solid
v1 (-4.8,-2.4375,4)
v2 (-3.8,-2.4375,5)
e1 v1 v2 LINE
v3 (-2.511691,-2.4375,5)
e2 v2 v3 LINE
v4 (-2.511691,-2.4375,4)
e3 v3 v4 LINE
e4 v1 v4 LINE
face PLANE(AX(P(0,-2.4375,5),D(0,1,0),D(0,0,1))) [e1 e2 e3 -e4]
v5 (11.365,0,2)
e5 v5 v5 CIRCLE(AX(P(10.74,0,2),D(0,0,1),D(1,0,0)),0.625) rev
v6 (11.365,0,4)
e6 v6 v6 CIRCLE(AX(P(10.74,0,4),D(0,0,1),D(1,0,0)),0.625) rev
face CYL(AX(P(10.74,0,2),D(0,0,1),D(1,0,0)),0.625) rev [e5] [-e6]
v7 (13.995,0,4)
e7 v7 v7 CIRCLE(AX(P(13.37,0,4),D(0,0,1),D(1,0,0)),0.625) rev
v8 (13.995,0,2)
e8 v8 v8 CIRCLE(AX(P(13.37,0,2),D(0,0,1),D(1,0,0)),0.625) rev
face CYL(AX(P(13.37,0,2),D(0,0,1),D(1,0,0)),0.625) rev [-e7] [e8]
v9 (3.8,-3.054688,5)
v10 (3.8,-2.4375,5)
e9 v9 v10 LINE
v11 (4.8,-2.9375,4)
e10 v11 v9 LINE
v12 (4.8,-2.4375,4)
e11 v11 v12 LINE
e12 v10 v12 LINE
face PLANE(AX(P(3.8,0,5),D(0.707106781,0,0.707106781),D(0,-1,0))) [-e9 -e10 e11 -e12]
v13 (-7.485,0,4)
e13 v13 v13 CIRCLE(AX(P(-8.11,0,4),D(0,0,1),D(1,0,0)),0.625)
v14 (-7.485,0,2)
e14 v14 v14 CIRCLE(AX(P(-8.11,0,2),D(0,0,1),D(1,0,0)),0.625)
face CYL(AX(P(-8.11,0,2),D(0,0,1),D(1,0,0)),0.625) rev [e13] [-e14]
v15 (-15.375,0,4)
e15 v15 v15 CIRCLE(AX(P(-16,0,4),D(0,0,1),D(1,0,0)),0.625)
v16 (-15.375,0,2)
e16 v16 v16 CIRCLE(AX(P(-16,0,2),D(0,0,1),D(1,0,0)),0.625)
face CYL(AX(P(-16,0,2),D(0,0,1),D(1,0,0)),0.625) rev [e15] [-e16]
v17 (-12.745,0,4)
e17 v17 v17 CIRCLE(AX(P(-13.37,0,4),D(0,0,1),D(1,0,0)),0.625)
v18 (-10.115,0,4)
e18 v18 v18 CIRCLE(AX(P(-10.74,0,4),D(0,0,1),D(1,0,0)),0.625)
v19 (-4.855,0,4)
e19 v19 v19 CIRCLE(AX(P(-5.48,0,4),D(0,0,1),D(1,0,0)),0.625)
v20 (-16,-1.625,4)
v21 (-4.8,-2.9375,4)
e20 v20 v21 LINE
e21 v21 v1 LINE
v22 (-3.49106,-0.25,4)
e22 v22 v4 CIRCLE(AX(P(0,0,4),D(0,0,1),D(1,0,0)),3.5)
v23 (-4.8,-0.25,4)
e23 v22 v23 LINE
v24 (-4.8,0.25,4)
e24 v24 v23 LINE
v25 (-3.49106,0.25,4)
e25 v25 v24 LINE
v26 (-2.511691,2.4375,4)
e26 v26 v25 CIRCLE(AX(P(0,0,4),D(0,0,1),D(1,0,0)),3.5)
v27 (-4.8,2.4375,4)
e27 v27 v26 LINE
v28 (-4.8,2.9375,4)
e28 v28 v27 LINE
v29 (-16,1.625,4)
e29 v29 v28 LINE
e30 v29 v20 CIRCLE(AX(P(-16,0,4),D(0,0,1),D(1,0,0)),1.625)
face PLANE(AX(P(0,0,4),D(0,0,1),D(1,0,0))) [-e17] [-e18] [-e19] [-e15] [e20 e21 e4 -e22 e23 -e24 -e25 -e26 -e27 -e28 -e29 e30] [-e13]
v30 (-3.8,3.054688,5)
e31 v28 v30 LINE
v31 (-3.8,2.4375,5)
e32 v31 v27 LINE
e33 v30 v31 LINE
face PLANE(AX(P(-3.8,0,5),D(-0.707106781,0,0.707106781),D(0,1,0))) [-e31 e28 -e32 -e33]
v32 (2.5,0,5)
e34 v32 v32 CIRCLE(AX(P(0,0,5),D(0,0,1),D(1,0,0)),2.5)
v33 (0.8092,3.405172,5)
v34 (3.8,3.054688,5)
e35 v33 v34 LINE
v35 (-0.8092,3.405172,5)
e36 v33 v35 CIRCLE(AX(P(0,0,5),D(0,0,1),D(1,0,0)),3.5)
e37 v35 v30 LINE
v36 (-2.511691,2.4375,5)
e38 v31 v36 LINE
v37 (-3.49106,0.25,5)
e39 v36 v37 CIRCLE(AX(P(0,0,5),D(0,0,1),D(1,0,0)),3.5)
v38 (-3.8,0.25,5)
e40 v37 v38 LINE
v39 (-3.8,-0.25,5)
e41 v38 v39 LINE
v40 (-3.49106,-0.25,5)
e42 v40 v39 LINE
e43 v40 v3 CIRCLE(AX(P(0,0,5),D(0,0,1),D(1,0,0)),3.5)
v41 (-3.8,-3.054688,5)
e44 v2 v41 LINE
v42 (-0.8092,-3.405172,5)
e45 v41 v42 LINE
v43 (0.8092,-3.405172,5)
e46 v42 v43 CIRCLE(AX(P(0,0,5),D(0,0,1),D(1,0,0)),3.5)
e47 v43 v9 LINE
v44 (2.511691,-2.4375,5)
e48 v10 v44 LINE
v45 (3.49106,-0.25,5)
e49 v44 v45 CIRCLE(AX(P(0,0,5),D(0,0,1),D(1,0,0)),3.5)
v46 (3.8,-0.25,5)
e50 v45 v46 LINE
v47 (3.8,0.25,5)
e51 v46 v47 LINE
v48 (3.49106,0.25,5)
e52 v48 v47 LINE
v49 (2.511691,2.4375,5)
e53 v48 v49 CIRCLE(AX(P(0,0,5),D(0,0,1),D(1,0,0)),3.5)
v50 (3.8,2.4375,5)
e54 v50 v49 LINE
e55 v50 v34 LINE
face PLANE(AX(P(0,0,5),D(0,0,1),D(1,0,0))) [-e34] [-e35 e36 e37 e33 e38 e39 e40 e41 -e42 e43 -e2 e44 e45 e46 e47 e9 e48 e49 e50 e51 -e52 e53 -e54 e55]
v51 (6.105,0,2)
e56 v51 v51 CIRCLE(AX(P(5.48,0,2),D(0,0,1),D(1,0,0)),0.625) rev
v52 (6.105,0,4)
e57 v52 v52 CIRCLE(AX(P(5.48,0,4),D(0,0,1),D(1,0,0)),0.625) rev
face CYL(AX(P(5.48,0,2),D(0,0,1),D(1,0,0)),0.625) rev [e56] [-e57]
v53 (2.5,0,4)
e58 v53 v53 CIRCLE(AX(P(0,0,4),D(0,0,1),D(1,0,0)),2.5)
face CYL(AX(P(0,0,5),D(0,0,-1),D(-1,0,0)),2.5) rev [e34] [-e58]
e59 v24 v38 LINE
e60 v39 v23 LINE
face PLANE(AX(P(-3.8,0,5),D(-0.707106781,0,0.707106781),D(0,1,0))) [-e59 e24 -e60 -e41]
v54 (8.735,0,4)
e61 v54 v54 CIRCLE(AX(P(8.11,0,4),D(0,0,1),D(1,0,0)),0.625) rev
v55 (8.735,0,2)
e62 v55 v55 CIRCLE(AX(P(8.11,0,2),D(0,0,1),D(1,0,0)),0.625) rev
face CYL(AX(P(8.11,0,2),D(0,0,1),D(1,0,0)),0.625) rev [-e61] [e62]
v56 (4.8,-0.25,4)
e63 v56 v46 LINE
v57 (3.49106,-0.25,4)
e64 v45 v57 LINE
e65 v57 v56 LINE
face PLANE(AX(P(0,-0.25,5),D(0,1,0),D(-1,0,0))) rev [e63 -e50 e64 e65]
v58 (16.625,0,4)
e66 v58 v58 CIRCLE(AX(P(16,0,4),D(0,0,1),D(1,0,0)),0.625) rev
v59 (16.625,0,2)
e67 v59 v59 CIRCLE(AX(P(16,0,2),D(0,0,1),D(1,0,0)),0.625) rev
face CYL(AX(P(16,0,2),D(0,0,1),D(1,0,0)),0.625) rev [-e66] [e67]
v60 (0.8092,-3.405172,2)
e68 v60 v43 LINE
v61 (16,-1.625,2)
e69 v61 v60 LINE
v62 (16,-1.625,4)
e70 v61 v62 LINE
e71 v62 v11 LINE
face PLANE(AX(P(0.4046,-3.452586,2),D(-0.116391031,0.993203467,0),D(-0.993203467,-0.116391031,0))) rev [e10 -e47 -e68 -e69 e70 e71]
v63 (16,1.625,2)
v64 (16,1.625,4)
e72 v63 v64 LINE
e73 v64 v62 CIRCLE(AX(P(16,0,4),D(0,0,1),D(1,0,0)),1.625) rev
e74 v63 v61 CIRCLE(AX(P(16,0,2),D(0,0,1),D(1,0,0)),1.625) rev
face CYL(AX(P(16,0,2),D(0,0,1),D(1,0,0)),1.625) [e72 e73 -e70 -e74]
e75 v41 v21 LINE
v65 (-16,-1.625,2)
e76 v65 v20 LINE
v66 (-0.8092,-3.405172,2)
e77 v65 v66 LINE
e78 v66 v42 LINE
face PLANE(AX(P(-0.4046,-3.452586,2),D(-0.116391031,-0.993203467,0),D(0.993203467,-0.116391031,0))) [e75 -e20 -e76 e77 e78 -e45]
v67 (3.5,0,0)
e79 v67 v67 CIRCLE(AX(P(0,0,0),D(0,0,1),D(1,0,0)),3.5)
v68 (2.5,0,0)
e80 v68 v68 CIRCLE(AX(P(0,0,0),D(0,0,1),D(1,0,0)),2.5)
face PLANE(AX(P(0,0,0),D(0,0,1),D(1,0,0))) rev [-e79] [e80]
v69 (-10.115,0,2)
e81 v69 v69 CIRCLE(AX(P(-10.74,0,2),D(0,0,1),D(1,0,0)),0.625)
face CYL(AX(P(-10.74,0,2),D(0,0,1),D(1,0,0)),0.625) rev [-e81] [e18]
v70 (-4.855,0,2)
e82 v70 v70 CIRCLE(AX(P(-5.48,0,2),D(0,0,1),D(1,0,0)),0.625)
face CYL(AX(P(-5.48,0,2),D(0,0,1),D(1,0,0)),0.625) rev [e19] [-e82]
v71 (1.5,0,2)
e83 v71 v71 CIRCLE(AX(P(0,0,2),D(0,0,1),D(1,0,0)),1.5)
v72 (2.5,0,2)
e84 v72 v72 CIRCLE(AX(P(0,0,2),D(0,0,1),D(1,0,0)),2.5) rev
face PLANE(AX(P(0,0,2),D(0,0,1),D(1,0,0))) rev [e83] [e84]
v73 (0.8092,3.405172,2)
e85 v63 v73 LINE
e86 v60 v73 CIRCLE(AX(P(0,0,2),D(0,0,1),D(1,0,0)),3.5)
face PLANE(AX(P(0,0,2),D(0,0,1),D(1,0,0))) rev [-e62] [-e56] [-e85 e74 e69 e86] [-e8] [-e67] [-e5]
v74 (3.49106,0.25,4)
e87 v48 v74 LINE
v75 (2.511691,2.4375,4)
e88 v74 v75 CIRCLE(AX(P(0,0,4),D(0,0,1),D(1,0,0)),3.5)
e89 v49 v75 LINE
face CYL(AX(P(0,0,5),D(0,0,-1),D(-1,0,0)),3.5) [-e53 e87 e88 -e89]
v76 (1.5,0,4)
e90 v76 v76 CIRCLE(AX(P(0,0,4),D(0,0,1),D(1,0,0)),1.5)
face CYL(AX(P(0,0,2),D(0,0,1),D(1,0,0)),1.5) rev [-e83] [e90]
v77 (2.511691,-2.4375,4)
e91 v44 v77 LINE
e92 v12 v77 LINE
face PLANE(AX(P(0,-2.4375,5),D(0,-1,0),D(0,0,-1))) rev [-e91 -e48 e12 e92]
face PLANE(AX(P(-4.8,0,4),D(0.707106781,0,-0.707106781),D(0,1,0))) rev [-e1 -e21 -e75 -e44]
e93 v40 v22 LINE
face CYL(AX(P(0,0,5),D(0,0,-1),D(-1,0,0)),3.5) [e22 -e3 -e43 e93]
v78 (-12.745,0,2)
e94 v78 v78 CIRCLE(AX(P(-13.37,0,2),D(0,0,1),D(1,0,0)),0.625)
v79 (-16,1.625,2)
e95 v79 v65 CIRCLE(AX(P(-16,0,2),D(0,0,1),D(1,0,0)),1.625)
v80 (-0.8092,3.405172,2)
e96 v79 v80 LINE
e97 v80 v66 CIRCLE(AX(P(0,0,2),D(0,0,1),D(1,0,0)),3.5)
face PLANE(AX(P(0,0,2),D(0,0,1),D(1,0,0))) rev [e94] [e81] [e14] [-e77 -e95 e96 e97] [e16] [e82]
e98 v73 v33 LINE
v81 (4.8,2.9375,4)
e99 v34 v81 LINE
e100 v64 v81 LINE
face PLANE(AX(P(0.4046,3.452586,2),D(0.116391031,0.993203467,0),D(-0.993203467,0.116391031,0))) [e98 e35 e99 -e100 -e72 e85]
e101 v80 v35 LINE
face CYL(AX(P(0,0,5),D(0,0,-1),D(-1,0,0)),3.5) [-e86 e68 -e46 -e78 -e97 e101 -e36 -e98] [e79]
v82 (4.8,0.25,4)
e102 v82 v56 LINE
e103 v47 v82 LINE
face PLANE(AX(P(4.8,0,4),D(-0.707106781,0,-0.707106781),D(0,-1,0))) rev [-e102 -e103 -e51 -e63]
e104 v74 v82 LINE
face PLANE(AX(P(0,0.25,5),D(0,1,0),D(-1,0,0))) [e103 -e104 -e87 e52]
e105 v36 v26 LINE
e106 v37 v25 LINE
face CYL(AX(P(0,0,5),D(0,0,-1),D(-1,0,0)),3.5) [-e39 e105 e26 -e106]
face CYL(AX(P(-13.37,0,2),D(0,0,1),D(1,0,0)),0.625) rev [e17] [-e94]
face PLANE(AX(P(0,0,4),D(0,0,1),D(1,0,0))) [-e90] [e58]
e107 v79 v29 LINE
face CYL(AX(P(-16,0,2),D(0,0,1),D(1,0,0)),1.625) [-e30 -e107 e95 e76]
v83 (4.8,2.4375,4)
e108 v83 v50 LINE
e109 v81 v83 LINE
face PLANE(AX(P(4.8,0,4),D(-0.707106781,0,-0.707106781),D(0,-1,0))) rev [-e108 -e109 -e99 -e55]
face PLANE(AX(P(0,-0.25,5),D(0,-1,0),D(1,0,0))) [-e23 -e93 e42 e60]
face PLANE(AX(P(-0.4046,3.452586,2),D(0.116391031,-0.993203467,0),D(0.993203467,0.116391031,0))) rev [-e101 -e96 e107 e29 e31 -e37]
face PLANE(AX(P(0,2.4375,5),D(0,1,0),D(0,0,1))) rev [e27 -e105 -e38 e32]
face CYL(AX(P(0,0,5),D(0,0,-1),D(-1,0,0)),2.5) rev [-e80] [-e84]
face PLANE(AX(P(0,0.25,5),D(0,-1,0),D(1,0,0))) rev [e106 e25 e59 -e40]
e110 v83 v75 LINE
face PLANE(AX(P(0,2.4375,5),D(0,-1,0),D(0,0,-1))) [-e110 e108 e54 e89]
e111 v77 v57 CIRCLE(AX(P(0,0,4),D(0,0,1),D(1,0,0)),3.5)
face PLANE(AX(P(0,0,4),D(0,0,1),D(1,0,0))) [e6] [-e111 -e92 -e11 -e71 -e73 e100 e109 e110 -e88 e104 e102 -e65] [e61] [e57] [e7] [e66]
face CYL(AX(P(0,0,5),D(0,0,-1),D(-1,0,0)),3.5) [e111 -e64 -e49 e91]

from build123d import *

# Parameters (mm, degrees)
SKETCH_1_R      = 3.5
SKETCH_1_R_2    = 2.5
EXTRUDE_1_DEPTH = 5
EXTRUDE_START   = -3
SKETCH_2_R      = 0.625
SKETCH_2_R_2    = 1.625
SKETCH_2_R_3    = 2.5
SKETCH_2_R_4    = 1.5
EXTRUDE_2_DEPTH = 2
EXTRUDE_3_DEPTH = 1
CHAMFER_1_SIZE  = 1


with BuildPart() as part:
    # Эскиз1 → Бобышка-Вытянуть1 (new body)
    with BuildSketch(Plane.XY):
        Circle(SKETCH_1_R)
        Circle(SKETCH_1_R_2, mode=Mode.SUBTRACT)
    extrude(amount=EXTRUDE_1_DEPTH)

    # Эскиз2 → Бобышка-Вытянуть2 (add)
    # profile 1 of 5: a face of its own
    with BuildSketch(Plane.XY.offset(5).offset(EXTRUDE_START)):
        with BuildLine():
            Line((-0.809199831, 3.405171895), (-16, 1.625))
            ThreePointArc((-16, 1.625), (-14.850951481, 1.149048519), (-14.375, 0))
            ThreePointArc((-14.375, 0), (-14.850951481, -1.149048519), (-16, -1.625))
            Line((-16, -1.625), (-0.809199831, -3.405171895))
            ThreePointArc((-0.809199831, -3.405171895), (-3.5, 0), (-0.809199831, 3.405171895))
        make_face()
        with Locations((-13.37, 0)):
            Circle(SKETCH_2_R, mode=Mode.SUBTRACT)
        with Locations((-10.74, 0)):
            Circle(SKETCH_2_R, mode=Mode.SUBTRACT)
        with Locations((-8.11, 0)):
            Circle(SKETCH_2_R, mode=Mode.SUBTRACT)
        with Locations((-5.48, 0)):
            Circle(SKETCH_2_R, mode=Mode.SUBTRACT)
    # profile 2 of 5: a face of its own
    with BuildSketch(Plane.XY.offset(5).offset(EXTRUDE_START)):
        with Locations((-16, 0)):
            Circle(SKETCH_2_R_2)
        with Locations((-16, 0)):
            Circle(SKETCH_2_R, mode=Mode.SUBTRACT)
    # profile 3 of 5: a face of its own
    with BuildSketch(Plane.XY.offset(5).offset(EXTRUDE_START)):
        with BuildLine():
            Line((16, 1.625), (0.809199831, 3.405171895))
            ThreePointArc((0.809199831, 3.405171895), (2.746106281, 2.170000068), (3.5, 0))
            ThreePointArc((3.5, 0), (2.746106281, -2.170000068), (0.809199831, -3.405171895))
            Line((0.809199831, -3.405171895), (16, -1.625))
            ThreePointArc((16, -1.625), (14.375, 0), (16, 1.625))
        make_face()
        with Locations((5.48, 0)):
            Circle(SKETCH_2_R, mode=Mode.SUBTRACT)
        with Locations((8.11, 0)):
            Circle(SKETCH_2_R, mode=Mode.SUBTRACT)
        with Locations((10.74, 0)):
            Circle(SKETCH_2_R, mode=Mode.SUBTRACT)
        with Locations((13.37, 0)):
            Circle(SKETCH_2_R, mode=Mode.SUBTRACT)
    # profile 4 of 5: a face of its own
    with BuildSketch(Plane.XY.offset(5).offset(EXTRUDE_START)):
        with Locations((16, 0)):
            Circle(SKETCH_2_R_2)
        with Locations((16, 0)):
            Circle(SKETCH_2_R, mode=Mode.SUBTRACT)
    # profile 5 of 5: a face of its own
    with BuildSketch(Plane.XY.offset(5).offset(EXTRUDE_START)):
        Circle(SKETCH_2_R_3)
        Circle(SKETCH_2_R_4, mode=Mode.SUBTRACT)
    extrude(amount=EXTRUDE_2_DEPTH)

    # Эскиз3 → Бобышка-Вытянуть3 (add)
    with BuildSketch(Plane.XY.offset(4)):
        with BuildLine():
            ThreePointArc((-2.511691412, 2.4375), (-1.729501919, 3.04283143), (-0.809199831, 3.405171895))
            Line((-0.809199831, 3.405171895), (-4.8, 2.9375))
            Line((-4.8, 2.9375), (-4.8, 2.4375))
            Line((-4.8, 2.4375), (-2.511691412, 2.4375))
        make_face()
        with BuildLine():
            ThreePointArc((-3.491060011, -0.25), (-3.5, 0), (-3.491060011, 0.25))
            Line((-3.491060011, 0.25), (-4.8, 0.25))
            Line((-4.8, 0.25), (-4.8, -0.25))
            Line((-4.8, -0.25), (-3.491060011, -0.25))
        make_face()
        with BuildLine():
            ThreePointArc((-0.809199831, -3.405171895), (-1.729501919, -3.04283143), (-2.511691412, -2.4375))
            Line((-2.511691412, -2.4375), (-4.8, -2.4375))
            Line((-4.8, -2.4375), (-4.8, -2.9375))
            Line((-4.8, -2.9375), (-0.809199831, -3.405171895))
        make_face()
        with BuildLine():
            Line((4.8, -2.4375), (2.511691412, -2.4375))
            ThreePointArc((2.511691412, -2.4375), (1.729501919, -3.04283143), (0.809199831, -3.405171895))
            Line((0.809199831, -3.405171895), (4.8, -2.9375))
            Line((4.8, -2.9375), (4.8, -2.4375))
        make_face()
        with BuildLine():
            Line((4.8, 0.25), (3.491060011, 0.25))
            ThreePointArc((3.491060011, 0.25), (3.497764289, 0.125079898), (3.5, 0))
            ThreePointArc((3.5, 0), (3.497764289, -0.125079898), (3.491060011, -0.25))
            Line((3.491060011, -0.25), (4.8, -0.25))
            Line((4.8, -0.25), (4.8, 0.25))
        make_face()
        with BuildLine():
            Line((4.8, 2.9375), (0.809199831, 3.405171895))
            ThreePointArc((0.809199831, 3.405171895), (1.729501919, 3.04283143), (2.511691412, 2.4375))
            Line((2.511691412, 2.4375), (4.8, 2.4375))
            Line((4.8, 2.4375), (4.8, 2.9375))
        make_face()
    extrude(amount=EXTRUDE_3_DEPTH)

    # Фаска1
    chamfer_1_edges = [part.edges().sort_by_distance(p)[0] for p in [
        (4.8, 2.6875, 5),
        (4.8, 0, 5),
        (4.8, -2.6875, 5),
        (-4.8, -2.6875, 5),
        (-4.8, 0, 5),
        (-4.8, 2.6875, 5),
    ]]
    chamfer(chamfer_1_edges, length=CHAMFER_1_SIZE - 0.0001)  # a hair under: the kernel refuses the full size


solid = part.part
